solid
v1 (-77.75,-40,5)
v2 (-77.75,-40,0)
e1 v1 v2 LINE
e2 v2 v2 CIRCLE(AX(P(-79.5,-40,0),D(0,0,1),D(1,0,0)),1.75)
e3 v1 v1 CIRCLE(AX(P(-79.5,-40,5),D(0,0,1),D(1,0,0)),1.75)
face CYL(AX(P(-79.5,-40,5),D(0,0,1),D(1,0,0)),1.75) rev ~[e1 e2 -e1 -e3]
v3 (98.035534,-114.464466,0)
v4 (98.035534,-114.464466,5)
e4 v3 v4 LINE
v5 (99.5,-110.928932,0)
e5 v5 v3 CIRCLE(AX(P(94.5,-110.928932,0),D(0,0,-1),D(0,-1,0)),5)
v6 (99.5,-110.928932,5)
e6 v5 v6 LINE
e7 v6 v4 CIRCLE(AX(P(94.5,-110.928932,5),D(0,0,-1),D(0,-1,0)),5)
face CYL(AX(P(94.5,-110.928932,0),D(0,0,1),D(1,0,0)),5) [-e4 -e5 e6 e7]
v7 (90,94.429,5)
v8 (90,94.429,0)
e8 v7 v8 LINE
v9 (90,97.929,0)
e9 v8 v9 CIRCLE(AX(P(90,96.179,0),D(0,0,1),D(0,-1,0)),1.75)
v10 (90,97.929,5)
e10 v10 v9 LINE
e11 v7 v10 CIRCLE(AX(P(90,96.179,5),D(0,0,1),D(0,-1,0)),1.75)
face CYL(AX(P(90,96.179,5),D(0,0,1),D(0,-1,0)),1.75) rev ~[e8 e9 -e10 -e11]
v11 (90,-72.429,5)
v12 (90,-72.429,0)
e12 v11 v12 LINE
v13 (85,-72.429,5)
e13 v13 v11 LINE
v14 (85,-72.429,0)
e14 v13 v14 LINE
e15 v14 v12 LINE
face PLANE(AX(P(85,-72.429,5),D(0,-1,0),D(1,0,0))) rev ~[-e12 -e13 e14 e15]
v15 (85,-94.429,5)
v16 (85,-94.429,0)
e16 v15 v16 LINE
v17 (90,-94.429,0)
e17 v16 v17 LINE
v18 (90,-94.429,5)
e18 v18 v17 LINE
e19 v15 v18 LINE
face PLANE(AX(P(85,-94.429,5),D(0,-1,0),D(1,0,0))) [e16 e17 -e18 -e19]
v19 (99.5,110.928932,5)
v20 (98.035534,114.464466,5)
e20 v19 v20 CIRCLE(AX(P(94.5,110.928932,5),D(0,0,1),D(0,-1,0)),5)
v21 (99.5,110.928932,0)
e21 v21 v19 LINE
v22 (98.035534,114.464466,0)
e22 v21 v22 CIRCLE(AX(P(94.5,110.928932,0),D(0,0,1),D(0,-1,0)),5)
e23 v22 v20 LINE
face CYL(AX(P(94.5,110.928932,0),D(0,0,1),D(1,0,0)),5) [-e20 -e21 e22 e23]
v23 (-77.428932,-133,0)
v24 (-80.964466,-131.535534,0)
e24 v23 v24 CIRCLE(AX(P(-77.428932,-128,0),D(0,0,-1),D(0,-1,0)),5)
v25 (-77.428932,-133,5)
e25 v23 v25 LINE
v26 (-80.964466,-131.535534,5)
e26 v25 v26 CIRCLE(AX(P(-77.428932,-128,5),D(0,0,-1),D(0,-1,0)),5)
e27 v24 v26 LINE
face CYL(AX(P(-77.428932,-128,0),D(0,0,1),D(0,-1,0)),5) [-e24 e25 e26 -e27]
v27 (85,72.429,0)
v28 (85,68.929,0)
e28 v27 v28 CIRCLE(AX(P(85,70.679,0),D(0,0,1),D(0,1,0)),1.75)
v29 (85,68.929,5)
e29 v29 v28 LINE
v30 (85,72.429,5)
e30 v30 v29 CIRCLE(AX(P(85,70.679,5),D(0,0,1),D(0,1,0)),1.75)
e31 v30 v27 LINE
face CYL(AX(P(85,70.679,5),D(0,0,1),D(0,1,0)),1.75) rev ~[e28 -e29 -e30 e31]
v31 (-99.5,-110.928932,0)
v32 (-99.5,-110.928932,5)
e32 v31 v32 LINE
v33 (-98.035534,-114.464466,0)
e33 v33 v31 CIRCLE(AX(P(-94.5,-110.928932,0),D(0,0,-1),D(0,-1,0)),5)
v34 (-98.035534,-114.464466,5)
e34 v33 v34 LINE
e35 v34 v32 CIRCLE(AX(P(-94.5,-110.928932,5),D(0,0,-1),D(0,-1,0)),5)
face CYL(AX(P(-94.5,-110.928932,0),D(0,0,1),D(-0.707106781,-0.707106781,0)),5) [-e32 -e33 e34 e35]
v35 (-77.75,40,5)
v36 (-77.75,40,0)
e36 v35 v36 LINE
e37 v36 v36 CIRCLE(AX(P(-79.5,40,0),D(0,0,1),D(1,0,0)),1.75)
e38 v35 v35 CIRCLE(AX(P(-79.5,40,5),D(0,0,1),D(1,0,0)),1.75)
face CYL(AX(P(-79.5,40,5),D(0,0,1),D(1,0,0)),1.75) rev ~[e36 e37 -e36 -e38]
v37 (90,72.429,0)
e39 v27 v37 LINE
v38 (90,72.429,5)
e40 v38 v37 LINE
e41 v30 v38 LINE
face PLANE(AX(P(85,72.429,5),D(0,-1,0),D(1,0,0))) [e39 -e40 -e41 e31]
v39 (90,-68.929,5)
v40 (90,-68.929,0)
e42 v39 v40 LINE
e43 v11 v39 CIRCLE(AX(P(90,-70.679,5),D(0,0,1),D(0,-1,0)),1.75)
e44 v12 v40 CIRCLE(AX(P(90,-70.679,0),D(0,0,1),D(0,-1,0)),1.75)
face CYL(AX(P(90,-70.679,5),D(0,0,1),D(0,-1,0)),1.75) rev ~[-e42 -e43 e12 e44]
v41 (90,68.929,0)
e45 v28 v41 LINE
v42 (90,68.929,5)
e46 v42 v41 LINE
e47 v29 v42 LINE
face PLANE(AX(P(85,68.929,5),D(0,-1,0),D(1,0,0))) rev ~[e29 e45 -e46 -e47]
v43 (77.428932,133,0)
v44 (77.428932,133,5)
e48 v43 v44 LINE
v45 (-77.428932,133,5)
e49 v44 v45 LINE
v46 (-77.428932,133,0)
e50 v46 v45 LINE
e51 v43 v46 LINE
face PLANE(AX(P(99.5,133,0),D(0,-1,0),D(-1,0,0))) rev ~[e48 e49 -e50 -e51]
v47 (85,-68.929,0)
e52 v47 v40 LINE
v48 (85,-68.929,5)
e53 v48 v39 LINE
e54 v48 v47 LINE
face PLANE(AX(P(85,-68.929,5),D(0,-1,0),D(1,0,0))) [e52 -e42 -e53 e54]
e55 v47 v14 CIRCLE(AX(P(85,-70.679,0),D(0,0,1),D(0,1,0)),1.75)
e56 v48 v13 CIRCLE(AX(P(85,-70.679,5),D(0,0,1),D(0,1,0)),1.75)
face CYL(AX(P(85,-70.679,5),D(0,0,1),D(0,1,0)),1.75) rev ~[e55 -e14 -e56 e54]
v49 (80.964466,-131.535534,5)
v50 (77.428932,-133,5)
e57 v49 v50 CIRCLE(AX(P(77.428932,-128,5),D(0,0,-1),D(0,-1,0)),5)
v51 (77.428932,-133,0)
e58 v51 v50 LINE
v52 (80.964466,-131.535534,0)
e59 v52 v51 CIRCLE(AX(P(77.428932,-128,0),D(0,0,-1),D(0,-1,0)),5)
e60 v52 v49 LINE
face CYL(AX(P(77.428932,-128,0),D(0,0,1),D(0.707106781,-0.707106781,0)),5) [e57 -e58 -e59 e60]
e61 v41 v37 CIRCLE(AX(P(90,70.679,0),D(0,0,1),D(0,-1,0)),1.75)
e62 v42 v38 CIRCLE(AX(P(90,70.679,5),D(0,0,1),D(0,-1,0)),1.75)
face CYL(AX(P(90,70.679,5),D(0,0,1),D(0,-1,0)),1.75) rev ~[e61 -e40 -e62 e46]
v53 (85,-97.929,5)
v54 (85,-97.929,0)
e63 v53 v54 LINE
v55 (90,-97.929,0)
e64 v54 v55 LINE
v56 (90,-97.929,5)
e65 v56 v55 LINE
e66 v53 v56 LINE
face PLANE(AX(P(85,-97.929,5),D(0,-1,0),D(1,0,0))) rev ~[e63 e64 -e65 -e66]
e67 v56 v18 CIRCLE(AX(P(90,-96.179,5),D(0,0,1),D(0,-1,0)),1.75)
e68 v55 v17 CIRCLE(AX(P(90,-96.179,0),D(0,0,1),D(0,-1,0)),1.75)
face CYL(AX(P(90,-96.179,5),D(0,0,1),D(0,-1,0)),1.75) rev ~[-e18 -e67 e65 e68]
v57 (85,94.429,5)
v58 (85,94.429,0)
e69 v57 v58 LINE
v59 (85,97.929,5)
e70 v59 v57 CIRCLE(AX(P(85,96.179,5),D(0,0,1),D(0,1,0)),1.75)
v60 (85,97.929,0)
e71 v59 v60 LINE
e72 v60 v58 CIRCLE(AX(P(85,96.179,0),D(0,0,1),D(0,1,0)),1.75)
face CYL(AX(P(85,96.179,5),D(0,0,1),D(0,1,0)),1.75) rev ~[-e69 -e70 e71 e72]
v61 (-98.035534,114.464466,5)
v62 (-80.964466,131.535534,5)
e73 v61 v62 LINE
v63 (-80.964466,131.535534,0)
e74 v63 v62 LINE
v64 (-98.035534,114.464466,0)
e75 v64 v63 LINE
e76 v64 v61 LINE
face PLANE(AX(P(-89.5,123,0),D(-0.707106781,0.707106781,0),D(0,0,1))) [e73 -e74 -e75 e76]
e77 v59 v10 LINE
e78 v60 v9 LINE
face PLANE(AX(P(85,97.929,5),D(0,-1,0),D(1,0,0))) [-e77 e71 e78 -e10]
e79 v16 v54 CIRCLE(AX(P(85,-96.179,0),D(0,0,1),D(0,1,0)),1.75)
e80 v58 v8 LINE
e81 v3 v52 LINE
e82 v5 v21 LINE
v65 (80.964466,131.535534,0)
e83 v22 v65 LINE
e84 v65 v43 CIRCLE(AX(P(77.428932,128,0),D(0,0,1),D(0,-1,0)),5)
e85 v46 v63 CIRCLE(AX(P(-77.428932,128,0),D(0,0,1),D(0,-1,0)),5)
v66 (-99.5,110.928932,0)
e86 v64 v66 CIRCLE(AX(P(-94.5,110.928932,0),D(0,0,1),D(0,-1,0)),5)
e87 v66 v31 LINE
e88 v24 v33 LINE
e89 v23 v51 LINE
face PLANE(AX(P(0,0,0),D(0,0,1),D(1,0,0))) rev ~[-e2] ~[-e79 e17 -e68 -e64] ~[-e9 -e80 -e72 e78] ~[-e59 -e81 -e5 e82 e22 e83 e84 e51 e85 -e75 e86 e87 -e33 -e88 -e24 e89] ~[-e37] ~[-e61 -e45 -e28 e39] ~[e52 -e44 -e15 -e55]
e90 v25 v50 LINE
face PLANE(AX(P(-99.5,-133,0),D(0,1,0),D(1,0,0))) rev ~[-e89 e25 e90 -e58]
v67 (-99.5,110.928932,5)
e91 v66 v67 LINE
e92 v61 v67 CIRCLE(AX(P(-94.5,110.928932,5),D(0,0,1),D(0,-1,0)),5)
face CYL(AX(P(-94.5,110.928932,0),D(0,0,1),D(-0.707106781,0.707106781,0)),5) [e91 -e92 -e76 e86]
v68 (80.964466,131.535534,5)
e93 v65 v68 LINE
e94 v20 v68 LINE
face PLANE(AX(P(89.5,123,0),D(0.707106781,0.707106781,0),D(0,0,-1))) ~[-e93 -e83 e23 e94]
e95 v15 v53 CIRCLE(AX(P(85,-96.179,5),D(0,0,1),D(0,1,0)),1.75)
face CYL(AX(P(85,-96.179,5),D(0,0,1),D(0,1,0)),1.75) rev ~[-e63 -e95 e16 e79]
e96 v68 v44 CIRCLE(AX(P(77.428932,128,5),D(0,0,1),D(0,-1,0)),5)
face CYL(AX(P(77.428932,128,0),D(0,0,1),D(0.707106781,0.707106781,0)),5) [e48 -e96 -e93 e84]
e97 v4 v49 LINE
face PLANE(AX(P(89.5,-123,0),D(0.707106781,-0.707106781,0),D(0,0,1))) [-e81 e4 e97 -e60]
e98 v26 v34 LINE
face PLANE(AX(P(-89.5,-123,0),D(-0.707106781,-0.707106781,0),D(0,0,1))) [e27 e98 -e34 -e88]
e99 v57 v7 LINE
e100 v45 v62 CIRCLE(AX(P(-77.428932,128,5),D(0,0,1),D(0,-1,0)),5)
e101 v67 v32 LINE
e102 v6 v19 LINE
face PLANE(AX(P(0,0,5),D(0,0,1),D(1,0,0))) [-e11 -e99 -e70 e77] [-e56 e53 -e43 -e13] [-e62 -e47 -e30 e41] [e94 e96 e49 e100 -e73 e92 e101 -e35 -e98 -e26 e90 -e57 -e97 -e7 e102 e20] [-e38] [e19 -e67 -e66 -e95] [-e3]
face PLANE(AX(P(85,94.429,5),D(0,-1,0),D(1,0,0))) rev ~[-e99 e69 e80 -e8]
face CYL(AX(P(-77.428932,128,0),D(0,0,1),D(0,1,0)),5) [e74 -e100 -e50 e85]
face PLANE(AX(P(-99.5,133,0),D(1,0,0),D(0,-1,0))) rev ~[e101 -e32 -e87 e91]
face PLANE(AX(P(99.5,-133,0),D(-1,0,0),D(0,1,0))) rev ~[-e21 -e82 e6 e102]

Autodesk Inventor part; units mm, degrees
ref_plane "YZ Plane" through (0, 0, 0) normal (1, 0, 0) x (0, 1, 0)
ref_plane "XZ Plane" through (0, 0, 0) normal (0, 1, 0) x (-1, 0, 0)
ref_plane "XY Plane" through (0, 0, 0) normal (0, 0, 1) x (1, 0, 0)
sketch "Hinges Screw Holes" plane through (0, 0, 0) normal (0, 0, 1) x (1, 0, 0)
  arc A0 (172, -72.429) -> (172, -68.929) centre (172, -70.679) ccw
  arc A1 (172, -97.929) -> (172, -94.429) centre (172, -96.179) ccw
  arc A2 (167, 97.929) -> (167, 94.429) centre (167, 96.179) ccw
  arc A3 (167, 72.429) -> (167, 68.929) centre (167, 70.679) ccw
  arc A4 (167, -68.929) -> (167, -72.429) centre (167, -70.679) ccw
  arc A5 (167, -94.429) -> (167, -97.929) centre (167, -96.179) ccw
  line L0 (167, 97.929) -> (172, 97.929)
  line L1 (167, 94.429) -> (172, 94.429)
  line L2 (167, 72.429) -> (172, 72.429)
  line L3 (167, 68.929) -> (172, 68.929)
  line L4 (167, -68.929) -> (172, -68.929)
  line L5 (167, -72.429) -> (172, -72.429)
  line L6 (167, -94.429) -> (172, -94.429)
  line L7 (167, -97.929) -> (172, -97.929)
  arc A6 (172, 94.429) -> (172, 97.929) centre (172, 96.179) ccw
  arc A7 (172, 68.929) -> (172, 72.429) centre (172, 70.679) ccw
  point P0 (169.5, 0)
  dimension "d28" = 3.5
  dimension "d29" = 3.5
  dimension "d30" = 25.5
  dimension "d31" = 3.5
  dimension "d32" = 3.5
  dimension "d33" = 25.5
  dimension "d34" = 141.358
  dimension "d35" = 3.5
  dimension "d36" = 3.5
  dimension "d37" = 25.5
  dimension "d38" = 3.5
  dimension "d39" = 3.5
  dimension "d40" = 25.5
  dimension "d41" = 141.358
  dimension "d42" = 5
sketch "Handle-Hole" plane through (0, 0, 0) normal (0, 0, 1) x (1, 0, 0)
  line L0 (-99.5, 50) -> (-69.5, 50)
  line L1 (-69.5, 50) -> (-69.5, -50)
  line L2 (-69.5, -50) -> (-99.5, -50)
  line L3 (-99.5, -50) -> (-99.5, 50)
  circle A0 centre (-87.5, 62) radius 1.75
  circle A1 centre (-57.5, 27.5) radius 1.75
  circle A2 centre (-57.5, -27.5) radius 1.75
  circle A3 centre (-87.5, -62) radius 1.75
  point P0 (-82.2826, 0)
  point P1 (-99.5, 0)
  point P2 (-99.5, 0)
  dimension "d11" = 30
  dimension "d12" = 100
  dimension "d13" = 3.5
  dimension "d14" = 3.5
  dimension "d15" = 3.5
  dimension "d16" = 3.5
  dimension "d17" = 55
  dimension "d19" = 12
  dimension "d20" = 12
  dimension "d22" = 12
sketch "Sketch1" plane through (0, 0, 0) normal (0, 0, 1) x (1, 0, 0)
  line L0 (-100, 133.5) -> (100, 133.5)
  line L1 (100, 133.5) -> (100, -133.5)
  line L2 (100, -133.5) -> (-100, -133.5)
  line L3 (-100, -133.5) -> (-100, 133.5)
  line L4 (99.5, 133) -> (-99.5, 133)
  line L5 (-99.5, 133) -> (-99.5, -133)
  line L6 (-99.5, -133) -> (99.5, -133)
  line L7 (99.5, -133) -> (99.5, 133)
  point P0 (0, 0)
  point P1 (0, 133.5)
  point P2 (-99.5, 0)
  dimension "d0" = 200
  dimension "d1" = 267
  dimension "d4" = 0.5
extrude "Extrusion1" add sketch "Sketch1" along normal blind 5 contours L7 L6 L5 L4
chamfer "Chamfer1" distance 20 angle 45 4 edges at (-99.5, -133, 2.5) (-99.5, 133, 2.5) (99.5, -133, 2.5) (99.5, 133, 2.5)
fillet "Fillet1" radius 5 8 edges at (-79.5, -133, 2.5) (79.5, -133, 2.5) (99.5, -113, 2.5) (99.5, 113, 2.5) (79.5, 133, 2.5) (-79.5, 133, 2.5) (-99.5, 113, 2.5) (-99.5, -113, 2.5)
sketch "Sketch2" plane through (0, 0, 5) normal (0, 0, 1) x (1, 0, 0)
  line L0 (99.5, -110.9289) -> (99.5, 110.9289) projected
  circle A0 centre (-79.5, 40) radius 1.75
  circle A1 centre (-79.5, -40) radius 1.75
  line L1 (-99.5, 110.9289) -> (-99.5, -110.9289) projected
  arc A2 (90, -72.429) -> (90, -68.929) centre (90, -70.679) ccw
  arc A3 (90, -97.929) -> (90, -94.429) centre (90, -96.179) ccw
  arc A4 (85, 97.929) -> (85, 94.429) centre (85, 96.179) ccw
  arc A5 (85, 72.429) -> (85, 68.929) centre (85, 70.679) ccw
  arc A6 (85, -68.929) -> (85, -72.429) centre (85, -70.679) ccw
  arc A7 (85, -94.429) -> (85, -97.929) centre (85, -96.179) ccw
  line L2 (85, 97.929) -> (90, 97.929)
  line L3 (85, 94.429) -> (90, 94.429)
  line L4 (85, 72.429) -> (90, 72.429)
  line L5 (85, 68.929) -> (90, 68.929)
  line L6 (85, -68.929) -> (90, -68.929)
  line L7 (85, -72.429) -> (90, -72.429)
  line L8 (85, -94.429) -> (90, -94.429)
  line L9 (85, -97.929) -> (90, -97.929)
  arc A8 (90, 94.429) -> (90, 97.929) centre (90, 96.179) ccw
  arc A9 (90, 68.929) -> (90, 72.429) centre (90, 70.679) ccw
  point P0 (0, 0)
  point P1 (0, 0)
  dimension "d43" = 141.358
  dimension "d44" = 70.679
  dimension "d45" = 9.5
  dimension "d46" = 9.5
  dimension "d47" = 3.5
  dimension "d48" = 80
  dimension "d49" = 20
  dimension "d50" = 40
extrude "Extrusion2" cut sketch "Sketch2" against normal blind 10
equation "\"d44\" = 0.5 * d43"
equation "\"d50\" = 0.5 * d48"
equation "\"d19\" = d20"
equation "\"d20\" = d21"
equation "\"d22\" = d21"
equation "\"d46\" = d45"
equation "\"d21\" = 12"
properties part number "Clear Right Side Door" material "Glass"
